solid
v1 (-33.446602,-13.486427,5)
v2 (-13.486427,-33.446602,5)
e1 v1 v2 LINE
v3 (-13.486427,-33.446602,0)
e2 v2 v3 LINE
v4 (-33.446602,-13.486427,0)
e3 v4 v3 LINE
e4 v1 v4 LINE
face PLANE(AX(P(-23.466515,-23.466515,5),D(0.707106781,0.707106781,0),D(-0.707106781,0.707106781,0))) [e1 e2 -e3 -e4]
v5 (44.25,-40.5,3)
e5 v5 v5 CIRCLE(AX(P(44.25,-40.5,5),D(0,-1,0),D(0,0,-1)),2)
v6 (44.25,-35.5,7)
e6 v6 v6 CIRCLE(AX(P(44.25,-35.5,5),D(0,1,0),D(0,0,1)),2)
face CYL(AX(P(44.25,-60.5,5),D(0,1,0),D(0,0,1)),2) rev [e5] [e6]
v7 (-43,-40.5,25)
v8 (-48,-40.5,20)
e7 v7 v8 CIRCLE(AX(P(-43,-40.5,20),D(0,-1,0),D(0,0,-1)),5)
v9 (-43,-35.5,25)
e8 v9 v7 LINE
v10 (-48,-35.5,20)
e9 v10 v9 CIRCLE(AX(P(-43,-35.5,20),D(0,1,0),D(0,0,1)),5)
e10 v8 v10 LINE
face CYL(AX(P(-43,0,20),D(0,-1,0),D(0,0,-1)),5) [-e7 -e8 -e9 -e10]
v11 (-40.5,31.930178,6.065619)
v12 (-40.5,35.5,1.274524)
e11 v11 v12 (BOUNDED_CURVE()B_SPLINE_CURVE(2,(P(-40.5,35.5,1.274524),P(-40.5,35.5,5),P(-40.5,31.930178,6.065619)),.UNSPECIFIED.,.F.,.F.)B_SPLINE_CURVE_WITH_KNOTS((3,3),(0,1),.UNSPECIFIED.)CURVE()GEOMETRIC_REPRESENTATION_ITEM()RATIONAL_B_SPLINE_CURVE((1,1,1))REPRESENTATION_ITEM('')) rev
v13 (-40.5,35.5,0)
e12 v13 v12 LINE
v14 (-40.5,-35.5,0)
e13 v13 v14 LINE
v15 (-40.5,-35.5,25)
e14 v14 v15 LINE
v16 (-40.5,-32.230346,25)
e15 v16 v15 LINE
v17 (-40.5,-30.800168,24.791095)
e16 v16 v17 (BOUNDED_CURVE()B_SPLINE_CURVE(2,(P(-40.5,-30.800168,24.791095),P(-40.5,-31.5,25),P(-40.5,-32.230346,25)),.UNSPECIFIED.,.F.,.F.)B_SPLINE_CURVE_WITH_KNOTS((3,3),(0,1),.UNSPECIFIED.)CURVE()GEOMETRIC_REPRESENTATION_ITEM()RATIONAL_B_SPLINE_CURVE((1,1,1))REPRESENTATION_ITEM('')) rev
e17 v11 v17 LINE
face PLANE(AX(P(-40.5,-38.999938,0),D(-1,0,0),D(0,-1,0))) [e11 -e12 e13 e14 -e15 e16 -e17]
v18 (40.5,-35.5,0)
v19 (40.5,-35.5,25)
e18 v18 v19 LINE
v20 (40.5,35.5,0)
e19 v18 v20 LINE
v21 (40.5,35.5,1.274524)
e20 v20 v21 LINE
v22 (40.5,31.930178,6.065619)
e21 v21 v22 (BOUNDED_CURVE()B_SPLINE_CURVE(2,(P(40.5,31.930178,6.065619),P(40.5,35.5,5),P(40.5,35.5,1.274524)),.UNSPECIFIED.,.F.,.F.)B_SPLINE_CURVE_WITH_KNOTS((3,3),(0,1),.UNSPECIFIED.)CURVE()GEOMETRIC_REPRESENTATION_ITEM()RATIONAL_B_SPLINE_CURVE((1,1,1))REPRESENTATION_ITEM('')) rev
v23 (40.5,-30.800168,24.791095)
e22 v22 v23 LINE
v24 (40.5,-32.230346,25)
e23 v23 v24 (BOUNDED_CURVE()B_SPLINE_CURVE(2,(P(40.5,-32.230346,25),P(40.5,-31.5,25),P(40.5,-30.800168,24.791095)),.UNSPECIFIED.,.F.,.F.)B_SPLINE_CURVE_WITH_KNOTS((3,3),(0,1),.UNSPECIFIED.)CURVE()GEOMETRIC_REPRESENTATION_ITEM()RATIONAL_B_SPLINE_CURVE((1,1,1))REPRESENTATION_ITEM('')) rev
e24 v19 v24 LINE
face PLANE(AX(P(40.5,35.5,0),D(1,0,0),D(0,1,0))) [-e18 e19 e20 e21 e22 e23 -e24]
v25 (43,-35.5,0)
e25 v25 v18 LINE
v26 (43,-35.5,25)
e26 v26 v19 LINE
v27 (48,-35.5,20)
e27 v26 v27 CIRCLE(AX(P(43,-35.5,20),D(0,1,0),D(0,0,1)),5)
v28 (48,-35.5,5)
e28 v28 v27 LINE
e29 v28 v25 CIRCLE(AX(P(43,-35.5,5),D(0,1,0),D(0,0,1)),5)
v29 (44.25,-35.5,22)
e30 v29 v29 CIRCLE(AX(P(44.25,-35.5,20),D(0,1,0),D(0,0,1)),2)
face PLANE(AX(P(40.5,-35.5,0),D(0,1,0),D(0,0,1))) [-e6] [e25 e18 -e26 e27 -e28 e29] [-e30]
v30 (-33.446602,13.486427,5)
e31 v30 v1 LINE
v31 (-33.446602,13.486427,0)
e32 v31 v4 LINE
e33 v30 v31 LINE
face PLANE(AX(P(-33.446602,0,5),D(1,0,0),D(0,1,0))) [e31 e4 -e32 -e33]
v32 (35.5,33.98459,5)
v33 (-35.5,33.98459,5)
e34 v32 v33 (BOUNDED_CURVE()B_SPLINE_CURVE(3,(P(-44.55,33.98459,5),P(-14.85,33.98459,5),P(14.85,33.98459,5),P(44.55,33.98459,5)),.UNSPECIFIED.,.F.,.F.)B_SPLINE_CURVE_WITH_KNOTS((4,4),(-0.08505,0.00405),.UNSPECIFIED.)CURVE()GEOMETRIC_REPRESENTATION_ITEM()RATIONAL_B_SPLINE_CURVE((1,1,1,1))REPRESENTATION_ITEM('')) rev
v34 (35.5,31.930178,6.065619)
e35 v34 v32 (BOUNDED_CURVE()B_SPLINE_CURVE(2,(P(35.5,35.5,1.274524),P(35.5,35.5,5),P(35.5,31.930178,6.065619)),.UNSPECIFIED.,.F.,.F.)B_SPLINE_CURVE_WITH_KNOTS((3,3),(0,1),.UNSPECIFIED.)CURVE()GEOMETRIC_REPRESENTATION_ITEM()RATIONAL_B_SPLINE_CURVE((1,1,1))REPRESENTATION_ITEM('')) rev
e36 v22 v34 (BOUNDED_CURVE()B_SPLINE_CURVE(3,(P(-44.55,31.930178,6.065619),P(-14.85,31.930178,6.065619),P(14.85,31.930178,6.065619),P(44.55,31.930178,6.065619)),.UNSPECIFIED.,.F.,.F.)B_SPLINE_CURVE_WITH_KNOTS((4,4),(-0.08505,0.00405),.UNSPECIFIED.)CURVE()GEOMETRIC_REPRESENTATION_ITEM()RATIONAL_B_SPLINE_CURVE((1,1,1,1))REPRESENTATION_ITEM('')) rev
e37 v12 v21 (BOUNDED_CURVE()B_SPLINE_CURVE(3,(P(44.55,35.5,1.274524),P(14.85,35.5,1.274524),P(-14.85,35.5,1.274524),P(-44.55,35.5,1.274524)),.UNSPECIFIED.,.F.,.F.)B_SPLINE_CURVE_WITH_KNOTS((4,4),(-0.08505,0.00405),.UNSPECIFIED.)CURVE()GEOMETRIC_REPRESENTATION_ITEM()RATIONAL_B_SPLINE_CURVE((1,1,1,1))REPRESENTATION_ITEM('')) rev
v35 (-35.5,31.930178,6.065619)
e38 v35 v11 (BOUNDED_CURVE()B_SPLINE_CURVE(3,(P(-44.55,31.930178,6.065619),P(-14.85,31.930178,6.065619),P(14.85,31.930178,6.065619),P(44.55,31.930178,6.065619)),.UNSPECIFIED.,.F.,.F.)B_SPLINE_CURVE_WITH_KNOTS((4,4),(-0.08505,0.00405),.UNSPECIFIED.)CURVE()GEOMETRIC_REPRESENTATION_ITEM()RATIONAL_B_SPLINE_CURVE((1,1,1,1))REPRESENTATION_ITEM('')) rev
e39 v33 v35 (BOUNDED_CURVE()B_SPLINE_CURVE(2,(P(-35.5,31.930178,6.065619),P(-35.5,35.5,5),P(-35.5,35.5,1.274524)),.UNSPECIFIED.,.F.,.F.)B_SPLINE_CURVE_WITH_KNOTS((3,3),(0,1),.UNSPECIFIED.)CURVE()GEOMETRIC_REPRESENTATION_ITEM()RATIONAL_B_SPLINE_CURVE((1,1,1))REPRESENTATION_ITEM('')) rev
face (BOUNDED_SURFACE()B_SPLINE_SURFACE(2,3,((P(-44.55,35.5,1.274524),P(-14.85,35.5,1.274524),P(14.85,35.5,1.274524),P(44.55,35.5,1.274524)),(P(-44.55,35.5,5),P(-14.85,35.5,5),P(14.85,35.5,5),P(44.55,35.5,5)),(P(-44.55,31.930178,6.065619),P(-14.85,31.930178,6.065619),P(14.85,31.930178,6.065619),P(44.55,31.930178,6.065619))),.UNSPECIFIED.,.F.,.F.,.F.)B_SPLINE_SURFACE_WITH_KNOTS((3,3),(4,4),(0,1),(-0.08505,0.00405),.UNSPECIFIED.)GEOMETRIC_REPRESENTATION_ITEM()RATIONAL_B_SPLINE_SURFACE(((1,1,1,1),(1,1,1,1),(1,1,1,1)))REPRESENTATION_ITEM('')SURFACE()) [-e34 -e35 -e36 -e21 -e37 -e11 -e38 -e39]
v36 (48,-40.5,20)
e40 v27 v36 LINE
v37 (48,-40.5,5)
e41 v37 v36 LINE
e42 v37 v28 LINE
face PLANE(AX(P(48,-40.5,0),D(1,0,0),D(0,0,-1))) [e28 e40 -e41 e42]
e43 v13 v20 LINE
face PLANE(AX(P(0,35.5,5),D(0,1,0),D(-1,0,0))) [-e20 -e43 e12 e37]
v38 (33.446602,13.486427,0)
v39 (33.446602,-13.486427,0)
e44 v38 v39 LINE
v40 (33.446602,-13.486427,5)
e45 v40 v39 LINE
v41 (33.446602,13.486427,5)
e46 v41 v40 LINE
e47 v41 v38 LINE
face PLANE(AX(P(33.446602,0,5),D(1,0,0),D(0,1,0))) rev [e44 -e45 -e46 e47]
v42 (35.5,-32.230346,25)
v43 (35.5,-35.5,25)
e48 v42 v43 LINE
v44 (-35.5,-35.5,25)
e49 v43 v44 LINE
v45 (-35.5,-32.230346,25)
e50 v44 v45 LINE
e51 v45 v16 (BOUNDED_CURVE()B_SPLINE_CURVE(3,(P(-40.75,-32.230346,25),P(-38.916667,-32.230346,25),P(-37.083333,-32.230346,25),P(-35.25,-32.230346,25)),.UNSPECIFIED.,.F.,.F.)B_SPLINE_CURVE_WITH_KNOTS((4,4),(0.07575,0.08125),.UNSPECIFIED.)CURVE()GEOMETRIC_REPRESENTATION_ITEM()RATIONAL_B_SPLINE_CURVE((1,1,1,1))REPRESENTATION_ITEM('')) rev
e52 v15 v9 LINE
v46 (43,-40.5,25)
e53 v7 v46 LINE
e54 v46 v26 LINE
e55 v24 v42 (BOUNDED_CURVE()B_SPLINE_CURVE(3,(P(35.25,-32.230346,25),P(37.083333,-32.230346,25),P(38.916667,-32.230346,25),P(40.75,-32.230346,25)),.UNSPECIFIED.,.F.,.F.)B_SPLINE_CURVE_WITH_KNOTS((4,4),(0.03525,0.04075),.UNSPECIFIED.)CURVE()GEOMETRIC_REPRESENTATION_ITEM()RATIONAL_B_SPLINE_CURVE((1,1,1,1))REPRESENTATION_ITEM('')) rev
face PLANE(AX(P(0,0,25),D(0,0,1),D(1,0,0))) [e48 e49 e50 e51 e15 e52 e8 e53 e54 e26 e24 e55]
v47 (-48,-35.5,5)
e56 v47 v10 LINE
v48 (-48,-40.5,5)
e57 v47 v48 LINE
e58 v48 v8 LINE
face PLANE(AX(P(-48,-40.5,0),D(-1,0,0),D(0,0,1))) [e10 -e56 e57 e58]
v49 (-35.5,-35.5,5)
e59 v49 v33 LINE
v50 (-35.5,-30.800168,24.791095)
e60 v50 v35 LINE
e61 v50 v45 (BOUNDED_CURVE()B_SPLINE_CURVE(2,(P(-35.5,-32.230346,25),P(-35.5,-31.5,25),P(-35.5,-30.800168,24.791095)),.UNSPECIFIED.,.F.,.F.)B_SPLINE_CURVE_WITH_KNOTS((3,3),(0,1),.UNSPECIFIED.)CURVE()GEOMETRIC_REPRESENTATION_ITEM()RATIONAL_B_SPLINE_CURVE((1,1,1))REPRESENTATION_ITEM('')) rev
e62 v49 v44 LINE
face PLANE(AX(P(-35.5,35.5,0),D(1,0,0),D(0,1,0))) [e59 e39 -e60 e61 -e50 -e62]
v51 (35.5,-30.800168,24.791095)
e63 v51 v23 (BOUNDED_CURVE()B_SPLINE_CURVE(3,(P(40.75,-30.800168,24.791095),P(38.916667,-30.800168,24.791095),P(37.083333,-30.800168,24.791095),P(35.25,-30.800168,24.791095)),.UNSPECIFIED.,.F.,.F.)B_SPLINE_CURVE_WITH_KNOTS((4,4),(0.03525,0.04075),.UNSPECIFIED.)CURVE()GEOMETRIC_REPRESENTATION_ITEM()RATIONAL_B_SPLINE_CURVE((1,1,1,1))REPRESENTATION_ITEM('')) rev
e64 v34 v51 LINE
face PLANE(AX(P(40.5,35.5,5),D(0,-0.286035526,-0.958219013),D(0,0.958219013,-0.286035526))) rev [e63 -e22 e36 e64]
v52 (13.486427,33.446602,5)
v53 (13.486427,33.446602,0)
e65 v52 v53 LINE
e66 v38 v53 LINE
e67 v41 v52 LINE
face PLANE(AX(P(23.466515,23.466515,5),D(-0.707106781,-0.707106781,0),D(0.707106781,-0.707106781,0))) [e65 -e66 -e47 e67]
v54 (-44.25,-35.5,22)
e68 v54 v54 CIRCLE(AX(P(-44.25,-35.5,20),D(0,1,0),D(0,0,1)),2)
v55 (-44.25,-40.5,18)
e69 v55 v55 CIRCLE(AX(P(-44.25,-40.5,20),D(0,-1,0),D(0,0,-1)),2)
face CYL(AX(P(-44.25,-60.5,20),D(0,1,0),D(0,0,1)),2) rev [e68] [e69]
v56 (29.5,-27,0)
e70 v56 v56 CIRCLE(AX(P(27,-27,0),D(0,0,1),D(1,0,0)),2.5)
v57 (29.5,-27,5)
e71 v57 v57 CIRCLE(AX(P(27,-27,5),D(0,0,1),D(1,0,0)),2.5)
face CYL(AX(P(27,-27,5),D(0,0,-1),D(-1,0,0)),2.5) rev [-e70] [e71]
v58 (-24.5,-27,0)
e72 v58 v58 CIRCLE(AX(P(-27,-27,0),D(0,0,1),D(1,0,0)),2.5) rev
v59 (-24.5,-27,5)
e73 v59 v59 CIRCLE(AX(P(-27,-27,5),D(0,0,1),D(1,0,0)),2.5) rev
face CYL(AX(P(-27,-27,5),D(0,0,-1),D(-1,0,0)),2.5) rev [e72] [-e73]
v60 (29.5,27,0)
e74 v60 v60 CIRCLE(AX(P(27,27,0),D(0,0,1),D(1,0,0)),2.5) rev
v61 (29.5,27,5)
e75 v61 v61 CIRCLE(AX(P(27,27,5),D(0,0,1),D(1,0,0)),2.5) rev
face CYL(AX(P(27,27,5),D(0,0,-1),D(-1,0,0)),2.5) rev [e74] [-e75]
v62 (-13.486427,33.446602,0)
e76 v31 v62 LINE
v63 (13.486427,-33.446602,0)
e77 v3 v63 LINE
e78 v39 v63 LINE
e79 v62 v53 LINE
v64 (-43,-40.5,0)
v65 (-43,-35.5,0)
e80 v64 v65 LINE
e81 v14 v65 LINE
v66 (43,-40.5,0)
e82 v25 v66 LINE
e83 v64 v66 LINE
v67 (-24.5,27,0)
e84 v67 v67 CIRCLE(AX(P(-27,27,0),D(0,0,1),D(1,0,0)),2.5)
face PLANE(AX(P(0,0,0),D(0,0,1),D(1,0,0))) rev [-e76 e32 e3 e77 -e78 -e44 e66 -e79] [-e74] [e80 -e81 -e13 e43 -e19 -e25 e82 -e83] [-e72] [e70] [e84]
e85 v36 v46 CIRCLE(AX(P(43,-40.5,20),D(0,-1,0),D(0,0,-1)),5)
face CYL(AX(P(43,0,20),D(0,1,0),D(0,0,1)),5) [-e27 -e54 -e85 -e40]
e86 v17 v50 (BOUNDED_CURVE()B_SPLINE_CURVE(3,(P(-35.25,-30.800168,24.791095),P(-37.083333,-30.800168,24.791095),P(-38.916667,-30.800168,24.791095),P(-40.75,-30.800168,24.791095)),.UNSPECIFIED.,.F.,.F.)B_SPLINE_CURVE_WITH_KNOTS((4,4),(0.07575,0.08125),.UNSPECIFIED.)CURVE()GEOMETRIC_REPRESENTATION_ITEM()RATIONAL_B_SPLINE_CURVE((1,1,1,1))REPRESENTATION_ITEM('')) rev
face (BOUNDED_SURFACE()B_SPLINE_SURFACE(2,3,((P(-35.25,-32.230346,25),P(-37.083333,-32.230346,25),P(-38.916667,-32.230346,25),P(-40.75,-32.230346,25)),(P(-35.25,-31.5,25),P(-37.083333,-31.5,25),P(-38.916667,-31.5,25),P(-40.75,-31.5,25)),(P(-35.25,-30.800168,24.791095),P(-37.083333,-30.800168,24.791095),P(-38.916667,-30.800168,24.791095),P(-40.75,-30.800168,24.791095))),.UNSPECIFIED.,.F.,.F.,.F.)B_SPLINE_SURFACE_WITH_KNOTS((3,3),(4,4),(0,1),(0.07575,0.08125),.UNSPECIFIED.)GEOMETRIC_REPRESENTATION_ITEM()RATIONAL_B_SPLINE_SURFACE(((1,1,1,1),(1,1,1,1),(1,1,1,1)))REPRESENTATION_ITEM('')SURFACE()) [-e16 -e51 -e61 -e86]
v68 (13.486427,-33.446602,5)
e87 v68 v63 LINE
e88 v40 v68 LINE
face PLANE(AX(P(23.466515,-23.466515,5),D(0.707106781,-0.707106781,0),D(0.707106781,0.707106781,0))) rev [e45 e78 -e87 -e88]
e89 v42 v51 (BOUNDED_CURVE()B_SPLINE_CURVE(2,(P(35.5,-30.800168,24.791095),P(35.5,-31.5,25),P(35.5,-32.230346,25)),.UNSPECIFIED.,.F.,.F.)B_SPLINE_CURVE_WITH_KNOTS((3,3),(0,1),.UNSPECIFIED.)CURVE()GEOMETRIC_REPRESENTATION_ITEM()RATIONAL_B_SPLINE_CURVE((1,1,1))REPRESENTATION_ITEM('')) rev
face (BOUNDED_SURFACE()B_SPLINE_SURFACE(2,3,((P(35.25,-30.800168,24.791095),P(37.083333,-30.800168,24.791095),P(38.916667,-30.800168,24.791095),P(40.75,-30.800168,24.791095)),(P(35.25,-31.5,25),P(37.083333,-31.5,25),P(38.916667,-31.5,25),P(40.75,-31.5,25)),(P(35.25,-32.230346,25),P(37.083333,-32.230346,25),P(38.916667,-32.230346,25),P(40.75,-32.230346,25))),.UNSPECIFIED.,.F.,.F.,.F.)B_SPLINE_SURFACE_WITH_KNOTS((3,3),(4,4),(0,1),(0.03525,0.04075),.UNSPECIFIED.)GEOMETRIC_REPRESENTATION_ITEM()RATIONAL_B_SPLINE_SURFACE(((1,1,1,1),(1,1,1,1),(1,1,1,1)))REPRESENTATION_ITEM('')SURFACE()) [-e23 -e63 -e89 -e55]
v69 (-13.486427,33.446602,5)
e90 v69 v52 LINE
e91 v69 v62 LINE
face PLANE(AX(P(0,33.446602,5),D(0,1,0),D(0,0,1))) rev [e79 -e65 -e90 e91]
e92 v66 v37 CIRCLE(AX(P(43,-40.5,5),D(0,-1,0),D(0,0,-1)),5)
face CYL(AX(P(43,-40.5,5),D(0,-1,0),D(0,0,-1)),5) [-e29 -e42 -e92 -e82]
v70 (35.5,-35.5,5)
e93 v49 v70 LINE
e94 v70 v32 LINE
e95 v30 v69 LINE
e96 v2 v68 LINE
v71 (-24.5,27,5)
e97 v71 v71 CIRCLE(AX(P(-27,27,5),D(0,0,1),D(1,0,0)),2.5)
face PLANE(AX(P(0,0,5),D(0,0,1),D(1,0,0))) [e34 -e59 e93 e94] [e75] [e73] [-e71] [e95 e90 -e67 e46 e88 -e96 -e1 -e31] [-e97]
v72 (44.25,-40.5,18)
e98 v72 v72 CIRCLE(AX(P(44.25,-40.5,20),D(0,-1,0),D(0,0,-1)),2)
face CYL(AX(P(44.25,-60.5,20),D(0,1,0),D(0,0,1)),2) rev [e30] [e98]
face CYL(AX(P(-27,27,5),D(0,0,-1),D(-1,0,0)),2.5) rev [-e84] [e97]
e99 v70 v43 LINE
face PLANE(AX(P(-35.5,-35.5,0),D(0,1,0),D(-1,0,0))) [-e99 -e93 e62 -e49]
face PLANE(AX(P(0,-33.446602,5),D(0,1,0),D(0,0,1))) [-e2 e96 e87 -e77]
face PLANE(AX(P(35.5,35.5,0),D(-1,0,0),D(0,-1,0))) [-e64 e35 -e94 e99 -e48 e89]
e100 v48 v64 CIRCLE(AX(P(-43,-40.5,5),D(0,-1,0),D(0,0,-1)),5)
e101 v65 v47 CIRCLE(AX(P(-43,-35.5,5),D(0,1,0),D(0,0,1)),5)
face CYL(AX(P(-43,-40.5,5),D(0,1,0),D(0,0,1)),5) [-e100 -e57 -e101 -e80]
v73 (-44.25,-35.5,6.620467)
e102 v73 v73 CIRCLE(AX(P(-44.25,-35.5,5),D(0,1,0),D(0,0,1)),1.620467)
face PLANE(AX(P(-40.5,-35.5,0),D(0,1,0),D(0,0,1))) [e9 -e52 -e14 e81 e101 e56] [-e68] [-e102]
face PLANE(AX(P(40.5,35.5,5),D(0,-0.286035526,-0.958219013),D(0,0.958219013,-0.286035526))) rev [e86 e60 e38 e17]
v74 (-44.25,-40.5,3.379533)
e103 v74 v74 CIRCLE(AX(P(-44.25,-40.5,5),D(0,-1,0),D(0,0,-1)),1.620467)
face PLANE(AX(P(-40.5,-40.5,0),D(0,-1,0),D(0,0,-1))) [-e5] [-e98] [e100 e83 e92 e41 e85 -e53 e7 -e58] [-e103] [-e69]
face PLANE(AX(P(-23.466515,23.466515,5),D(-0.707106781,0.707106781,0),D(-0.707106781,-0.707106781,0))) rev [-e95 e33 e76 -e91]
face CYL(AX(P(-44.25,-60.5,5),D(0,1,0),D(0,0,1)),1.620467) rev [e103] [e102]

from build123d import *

# Parameters (mm, degrees)
SKETCH4_W                = 71
SKETCH4_H                = 71
SKETCH4_R                = 2.5
BOSS_EXTRUDE3_DEPTH      = 5
BOSS_EXTRUDE4_DEPTH      = 20
BOSS_EXTRUDE4_DEPTH_BACK = 5
CUT_EXTRUDE1_DEPTH       = 94.948123983
FILLET2_START            = -41
FILLET2_DEPTH            = 82
SKETCH8_W                = 7.5
SKETCH8_H                = 5
BOSS_EXTRUDE5_DEPTH      = 25
FILLET3_R                = 5
SKETCH10_R               = 2
SKETCH10_R_2             = 1.620466931
CUT_EXTRUDE2_DEPTH       = 25


with BuildPart() as part:
    # Sketch4 → Boss-Extrude3 (new body)
    with BuildSketch(Plane.XY):
        Rectangle(SKETCH4_W, SKETCH4_H)
        with Locations((-27, 27)):
            Circle(SKETCH4_R, mode=Mode.SUBTRACT)
        with Locations((27, 27)):
            Circle(SKETCH4_R, mode=Mode.SUBTRACT)
        with Locations((27, -27)):
            Circle(SKETCH4_R, mode=Mode.SUBTRACT)
        with Locations((-27, -27)):
            Circle(SKETCH4_R, mode=Mode.SUBTRACT)
        Polygon((-33.446601953, 13.48642712), (-13.48642712, 33.446601953), (13.48642712, 33.446601953), (33.446601953, 13.48642712), (33.446601953, -13.48642712), (13.48642712, -33.446601953), (-13.48642712, -33.446601953), (-33.446601953, -13.48642712), align=None, mode=Mode.SUBTRACT)
    extrude(amount=BOSS_EXTRUDE3_DEPTH)

    # Sketch5 → Boss-Extrude4 (add, two sides: drawn at the far end of the back side and taken through both)
    with BuildSketch(Plane.XY.offset(5).offset(-BOSS_EXTRUDE4_DEPTH_BACK)):
        Polygon((-35.5, 35.5), (-40.5, 35.5), (-40.5, -38.999937635), (-40.5, -40.5), (40.5, -40.5), (40.5, -38.999937635), (40.5, 35.5), (35.5, 35.5), (35.5, -35.5), (-35.5, -35.5), align=None)
    extrude(amount=BOSS_EXTRUDE4_DEPTH + BOSS_EXTRUDE4_DEPTH_BACK)

    # Sketch6 → Cut-Extrude1 (cut, through all)
    with BuildSketch(Plane.ZY.offset(40.5)):
        Polygon((5, 35.5), (25, 35.5), (25, -31.5), align=None)
    extrude(amount=-CUT_EXTRUDE1_DEPTH, mode=Mode.SUBTRACT)

    # Fillet2: read off the stored shape, not the designer's step
    # Fillet2 outline → Fillet2 (cut)
    with BuildSketch(Plane.YZ.offset(FILLET2_START)):
        with BuildLine():
            add(Edge.make_bspline(
                [(-30.800168474, 24.791095067), (-31.5, 25), (-32.230346106, 25)],
                knots=[0, 0, 0, 1, 1, 1], degree=2))
            Line((-30.800168474, 24.791095067), (-31.5, 25))
            Line((-31.5, 25), (-32.230346106, 25))
        make_face()
        with BuildLine():
            Line((35.5, 1.27452355), (35.5, 5))
            Line((35.5, 5), (31.930177632, 6.065618617))
            add(Edge.make_bspline(
                [(31.930177632, 6.065618617), (35.5, 5), (35.5, 1.27452355)],
                knots=[0.651540973, 0.651540973, 0.651540973, 1.651540973, 1.651540973, 1.651540973], degree=2))
        make_face()
    extrude(amount=FILLET2_DEPTH, mode=Mode.SUBTRACT)

    # Sketch8 → Boss-Extrude5 (add)
    with BuildSketch(Plane.XY.offset(25)):
        with Locations((-44.25, -38)):
            Rectangle(SKETCH8_W, SKETCH8_H)
        with Locations((44.25, -38)):
            Rectangle(SKETCH8_W, SKETCH8_H)
    extrude(amount=-BOSS_EXTRUDE5_DEPTH)

    # Fillet3
    fillet3_edges = [part.edges().sort_by_distance(p)[0] for p in [
        (-48, -38, 0),
        (-48, -38, 25),
        (48, -38, 0),
        (48, -38, 25),
    ]]
    fillet(fillet3_edges, radius=FILLET3_R)

    # Sketch10 → Cut-Extrude2 (cut)
    with BuildSketch(Plane(origin=(0, -35.5, 0), x_dir=(1, 0, 0), z_dir=(0, 1, 0))):
        with Locations(Location((44.25, -5, 0), (0, 0, 270))):
            Circle(SKETCH10_R)
        with Locations(Location((-44.25, -5, 0), (0, 0, 270))):
            Circle(SKETCH10_R_2)
        with Locations(Location((-44.25, -20, 0), (0, 0, 270))):
            Circle(SKETCH10_R)
        with Locations(Location((44.25, -20, 0), (0, 0, 270))):
            Circle(SKETCH10_R)
    extrude(amount=-CUT_EXTRUDE2_DEPTH, mode=Mode.SUBTRACT)


solid = part.part
